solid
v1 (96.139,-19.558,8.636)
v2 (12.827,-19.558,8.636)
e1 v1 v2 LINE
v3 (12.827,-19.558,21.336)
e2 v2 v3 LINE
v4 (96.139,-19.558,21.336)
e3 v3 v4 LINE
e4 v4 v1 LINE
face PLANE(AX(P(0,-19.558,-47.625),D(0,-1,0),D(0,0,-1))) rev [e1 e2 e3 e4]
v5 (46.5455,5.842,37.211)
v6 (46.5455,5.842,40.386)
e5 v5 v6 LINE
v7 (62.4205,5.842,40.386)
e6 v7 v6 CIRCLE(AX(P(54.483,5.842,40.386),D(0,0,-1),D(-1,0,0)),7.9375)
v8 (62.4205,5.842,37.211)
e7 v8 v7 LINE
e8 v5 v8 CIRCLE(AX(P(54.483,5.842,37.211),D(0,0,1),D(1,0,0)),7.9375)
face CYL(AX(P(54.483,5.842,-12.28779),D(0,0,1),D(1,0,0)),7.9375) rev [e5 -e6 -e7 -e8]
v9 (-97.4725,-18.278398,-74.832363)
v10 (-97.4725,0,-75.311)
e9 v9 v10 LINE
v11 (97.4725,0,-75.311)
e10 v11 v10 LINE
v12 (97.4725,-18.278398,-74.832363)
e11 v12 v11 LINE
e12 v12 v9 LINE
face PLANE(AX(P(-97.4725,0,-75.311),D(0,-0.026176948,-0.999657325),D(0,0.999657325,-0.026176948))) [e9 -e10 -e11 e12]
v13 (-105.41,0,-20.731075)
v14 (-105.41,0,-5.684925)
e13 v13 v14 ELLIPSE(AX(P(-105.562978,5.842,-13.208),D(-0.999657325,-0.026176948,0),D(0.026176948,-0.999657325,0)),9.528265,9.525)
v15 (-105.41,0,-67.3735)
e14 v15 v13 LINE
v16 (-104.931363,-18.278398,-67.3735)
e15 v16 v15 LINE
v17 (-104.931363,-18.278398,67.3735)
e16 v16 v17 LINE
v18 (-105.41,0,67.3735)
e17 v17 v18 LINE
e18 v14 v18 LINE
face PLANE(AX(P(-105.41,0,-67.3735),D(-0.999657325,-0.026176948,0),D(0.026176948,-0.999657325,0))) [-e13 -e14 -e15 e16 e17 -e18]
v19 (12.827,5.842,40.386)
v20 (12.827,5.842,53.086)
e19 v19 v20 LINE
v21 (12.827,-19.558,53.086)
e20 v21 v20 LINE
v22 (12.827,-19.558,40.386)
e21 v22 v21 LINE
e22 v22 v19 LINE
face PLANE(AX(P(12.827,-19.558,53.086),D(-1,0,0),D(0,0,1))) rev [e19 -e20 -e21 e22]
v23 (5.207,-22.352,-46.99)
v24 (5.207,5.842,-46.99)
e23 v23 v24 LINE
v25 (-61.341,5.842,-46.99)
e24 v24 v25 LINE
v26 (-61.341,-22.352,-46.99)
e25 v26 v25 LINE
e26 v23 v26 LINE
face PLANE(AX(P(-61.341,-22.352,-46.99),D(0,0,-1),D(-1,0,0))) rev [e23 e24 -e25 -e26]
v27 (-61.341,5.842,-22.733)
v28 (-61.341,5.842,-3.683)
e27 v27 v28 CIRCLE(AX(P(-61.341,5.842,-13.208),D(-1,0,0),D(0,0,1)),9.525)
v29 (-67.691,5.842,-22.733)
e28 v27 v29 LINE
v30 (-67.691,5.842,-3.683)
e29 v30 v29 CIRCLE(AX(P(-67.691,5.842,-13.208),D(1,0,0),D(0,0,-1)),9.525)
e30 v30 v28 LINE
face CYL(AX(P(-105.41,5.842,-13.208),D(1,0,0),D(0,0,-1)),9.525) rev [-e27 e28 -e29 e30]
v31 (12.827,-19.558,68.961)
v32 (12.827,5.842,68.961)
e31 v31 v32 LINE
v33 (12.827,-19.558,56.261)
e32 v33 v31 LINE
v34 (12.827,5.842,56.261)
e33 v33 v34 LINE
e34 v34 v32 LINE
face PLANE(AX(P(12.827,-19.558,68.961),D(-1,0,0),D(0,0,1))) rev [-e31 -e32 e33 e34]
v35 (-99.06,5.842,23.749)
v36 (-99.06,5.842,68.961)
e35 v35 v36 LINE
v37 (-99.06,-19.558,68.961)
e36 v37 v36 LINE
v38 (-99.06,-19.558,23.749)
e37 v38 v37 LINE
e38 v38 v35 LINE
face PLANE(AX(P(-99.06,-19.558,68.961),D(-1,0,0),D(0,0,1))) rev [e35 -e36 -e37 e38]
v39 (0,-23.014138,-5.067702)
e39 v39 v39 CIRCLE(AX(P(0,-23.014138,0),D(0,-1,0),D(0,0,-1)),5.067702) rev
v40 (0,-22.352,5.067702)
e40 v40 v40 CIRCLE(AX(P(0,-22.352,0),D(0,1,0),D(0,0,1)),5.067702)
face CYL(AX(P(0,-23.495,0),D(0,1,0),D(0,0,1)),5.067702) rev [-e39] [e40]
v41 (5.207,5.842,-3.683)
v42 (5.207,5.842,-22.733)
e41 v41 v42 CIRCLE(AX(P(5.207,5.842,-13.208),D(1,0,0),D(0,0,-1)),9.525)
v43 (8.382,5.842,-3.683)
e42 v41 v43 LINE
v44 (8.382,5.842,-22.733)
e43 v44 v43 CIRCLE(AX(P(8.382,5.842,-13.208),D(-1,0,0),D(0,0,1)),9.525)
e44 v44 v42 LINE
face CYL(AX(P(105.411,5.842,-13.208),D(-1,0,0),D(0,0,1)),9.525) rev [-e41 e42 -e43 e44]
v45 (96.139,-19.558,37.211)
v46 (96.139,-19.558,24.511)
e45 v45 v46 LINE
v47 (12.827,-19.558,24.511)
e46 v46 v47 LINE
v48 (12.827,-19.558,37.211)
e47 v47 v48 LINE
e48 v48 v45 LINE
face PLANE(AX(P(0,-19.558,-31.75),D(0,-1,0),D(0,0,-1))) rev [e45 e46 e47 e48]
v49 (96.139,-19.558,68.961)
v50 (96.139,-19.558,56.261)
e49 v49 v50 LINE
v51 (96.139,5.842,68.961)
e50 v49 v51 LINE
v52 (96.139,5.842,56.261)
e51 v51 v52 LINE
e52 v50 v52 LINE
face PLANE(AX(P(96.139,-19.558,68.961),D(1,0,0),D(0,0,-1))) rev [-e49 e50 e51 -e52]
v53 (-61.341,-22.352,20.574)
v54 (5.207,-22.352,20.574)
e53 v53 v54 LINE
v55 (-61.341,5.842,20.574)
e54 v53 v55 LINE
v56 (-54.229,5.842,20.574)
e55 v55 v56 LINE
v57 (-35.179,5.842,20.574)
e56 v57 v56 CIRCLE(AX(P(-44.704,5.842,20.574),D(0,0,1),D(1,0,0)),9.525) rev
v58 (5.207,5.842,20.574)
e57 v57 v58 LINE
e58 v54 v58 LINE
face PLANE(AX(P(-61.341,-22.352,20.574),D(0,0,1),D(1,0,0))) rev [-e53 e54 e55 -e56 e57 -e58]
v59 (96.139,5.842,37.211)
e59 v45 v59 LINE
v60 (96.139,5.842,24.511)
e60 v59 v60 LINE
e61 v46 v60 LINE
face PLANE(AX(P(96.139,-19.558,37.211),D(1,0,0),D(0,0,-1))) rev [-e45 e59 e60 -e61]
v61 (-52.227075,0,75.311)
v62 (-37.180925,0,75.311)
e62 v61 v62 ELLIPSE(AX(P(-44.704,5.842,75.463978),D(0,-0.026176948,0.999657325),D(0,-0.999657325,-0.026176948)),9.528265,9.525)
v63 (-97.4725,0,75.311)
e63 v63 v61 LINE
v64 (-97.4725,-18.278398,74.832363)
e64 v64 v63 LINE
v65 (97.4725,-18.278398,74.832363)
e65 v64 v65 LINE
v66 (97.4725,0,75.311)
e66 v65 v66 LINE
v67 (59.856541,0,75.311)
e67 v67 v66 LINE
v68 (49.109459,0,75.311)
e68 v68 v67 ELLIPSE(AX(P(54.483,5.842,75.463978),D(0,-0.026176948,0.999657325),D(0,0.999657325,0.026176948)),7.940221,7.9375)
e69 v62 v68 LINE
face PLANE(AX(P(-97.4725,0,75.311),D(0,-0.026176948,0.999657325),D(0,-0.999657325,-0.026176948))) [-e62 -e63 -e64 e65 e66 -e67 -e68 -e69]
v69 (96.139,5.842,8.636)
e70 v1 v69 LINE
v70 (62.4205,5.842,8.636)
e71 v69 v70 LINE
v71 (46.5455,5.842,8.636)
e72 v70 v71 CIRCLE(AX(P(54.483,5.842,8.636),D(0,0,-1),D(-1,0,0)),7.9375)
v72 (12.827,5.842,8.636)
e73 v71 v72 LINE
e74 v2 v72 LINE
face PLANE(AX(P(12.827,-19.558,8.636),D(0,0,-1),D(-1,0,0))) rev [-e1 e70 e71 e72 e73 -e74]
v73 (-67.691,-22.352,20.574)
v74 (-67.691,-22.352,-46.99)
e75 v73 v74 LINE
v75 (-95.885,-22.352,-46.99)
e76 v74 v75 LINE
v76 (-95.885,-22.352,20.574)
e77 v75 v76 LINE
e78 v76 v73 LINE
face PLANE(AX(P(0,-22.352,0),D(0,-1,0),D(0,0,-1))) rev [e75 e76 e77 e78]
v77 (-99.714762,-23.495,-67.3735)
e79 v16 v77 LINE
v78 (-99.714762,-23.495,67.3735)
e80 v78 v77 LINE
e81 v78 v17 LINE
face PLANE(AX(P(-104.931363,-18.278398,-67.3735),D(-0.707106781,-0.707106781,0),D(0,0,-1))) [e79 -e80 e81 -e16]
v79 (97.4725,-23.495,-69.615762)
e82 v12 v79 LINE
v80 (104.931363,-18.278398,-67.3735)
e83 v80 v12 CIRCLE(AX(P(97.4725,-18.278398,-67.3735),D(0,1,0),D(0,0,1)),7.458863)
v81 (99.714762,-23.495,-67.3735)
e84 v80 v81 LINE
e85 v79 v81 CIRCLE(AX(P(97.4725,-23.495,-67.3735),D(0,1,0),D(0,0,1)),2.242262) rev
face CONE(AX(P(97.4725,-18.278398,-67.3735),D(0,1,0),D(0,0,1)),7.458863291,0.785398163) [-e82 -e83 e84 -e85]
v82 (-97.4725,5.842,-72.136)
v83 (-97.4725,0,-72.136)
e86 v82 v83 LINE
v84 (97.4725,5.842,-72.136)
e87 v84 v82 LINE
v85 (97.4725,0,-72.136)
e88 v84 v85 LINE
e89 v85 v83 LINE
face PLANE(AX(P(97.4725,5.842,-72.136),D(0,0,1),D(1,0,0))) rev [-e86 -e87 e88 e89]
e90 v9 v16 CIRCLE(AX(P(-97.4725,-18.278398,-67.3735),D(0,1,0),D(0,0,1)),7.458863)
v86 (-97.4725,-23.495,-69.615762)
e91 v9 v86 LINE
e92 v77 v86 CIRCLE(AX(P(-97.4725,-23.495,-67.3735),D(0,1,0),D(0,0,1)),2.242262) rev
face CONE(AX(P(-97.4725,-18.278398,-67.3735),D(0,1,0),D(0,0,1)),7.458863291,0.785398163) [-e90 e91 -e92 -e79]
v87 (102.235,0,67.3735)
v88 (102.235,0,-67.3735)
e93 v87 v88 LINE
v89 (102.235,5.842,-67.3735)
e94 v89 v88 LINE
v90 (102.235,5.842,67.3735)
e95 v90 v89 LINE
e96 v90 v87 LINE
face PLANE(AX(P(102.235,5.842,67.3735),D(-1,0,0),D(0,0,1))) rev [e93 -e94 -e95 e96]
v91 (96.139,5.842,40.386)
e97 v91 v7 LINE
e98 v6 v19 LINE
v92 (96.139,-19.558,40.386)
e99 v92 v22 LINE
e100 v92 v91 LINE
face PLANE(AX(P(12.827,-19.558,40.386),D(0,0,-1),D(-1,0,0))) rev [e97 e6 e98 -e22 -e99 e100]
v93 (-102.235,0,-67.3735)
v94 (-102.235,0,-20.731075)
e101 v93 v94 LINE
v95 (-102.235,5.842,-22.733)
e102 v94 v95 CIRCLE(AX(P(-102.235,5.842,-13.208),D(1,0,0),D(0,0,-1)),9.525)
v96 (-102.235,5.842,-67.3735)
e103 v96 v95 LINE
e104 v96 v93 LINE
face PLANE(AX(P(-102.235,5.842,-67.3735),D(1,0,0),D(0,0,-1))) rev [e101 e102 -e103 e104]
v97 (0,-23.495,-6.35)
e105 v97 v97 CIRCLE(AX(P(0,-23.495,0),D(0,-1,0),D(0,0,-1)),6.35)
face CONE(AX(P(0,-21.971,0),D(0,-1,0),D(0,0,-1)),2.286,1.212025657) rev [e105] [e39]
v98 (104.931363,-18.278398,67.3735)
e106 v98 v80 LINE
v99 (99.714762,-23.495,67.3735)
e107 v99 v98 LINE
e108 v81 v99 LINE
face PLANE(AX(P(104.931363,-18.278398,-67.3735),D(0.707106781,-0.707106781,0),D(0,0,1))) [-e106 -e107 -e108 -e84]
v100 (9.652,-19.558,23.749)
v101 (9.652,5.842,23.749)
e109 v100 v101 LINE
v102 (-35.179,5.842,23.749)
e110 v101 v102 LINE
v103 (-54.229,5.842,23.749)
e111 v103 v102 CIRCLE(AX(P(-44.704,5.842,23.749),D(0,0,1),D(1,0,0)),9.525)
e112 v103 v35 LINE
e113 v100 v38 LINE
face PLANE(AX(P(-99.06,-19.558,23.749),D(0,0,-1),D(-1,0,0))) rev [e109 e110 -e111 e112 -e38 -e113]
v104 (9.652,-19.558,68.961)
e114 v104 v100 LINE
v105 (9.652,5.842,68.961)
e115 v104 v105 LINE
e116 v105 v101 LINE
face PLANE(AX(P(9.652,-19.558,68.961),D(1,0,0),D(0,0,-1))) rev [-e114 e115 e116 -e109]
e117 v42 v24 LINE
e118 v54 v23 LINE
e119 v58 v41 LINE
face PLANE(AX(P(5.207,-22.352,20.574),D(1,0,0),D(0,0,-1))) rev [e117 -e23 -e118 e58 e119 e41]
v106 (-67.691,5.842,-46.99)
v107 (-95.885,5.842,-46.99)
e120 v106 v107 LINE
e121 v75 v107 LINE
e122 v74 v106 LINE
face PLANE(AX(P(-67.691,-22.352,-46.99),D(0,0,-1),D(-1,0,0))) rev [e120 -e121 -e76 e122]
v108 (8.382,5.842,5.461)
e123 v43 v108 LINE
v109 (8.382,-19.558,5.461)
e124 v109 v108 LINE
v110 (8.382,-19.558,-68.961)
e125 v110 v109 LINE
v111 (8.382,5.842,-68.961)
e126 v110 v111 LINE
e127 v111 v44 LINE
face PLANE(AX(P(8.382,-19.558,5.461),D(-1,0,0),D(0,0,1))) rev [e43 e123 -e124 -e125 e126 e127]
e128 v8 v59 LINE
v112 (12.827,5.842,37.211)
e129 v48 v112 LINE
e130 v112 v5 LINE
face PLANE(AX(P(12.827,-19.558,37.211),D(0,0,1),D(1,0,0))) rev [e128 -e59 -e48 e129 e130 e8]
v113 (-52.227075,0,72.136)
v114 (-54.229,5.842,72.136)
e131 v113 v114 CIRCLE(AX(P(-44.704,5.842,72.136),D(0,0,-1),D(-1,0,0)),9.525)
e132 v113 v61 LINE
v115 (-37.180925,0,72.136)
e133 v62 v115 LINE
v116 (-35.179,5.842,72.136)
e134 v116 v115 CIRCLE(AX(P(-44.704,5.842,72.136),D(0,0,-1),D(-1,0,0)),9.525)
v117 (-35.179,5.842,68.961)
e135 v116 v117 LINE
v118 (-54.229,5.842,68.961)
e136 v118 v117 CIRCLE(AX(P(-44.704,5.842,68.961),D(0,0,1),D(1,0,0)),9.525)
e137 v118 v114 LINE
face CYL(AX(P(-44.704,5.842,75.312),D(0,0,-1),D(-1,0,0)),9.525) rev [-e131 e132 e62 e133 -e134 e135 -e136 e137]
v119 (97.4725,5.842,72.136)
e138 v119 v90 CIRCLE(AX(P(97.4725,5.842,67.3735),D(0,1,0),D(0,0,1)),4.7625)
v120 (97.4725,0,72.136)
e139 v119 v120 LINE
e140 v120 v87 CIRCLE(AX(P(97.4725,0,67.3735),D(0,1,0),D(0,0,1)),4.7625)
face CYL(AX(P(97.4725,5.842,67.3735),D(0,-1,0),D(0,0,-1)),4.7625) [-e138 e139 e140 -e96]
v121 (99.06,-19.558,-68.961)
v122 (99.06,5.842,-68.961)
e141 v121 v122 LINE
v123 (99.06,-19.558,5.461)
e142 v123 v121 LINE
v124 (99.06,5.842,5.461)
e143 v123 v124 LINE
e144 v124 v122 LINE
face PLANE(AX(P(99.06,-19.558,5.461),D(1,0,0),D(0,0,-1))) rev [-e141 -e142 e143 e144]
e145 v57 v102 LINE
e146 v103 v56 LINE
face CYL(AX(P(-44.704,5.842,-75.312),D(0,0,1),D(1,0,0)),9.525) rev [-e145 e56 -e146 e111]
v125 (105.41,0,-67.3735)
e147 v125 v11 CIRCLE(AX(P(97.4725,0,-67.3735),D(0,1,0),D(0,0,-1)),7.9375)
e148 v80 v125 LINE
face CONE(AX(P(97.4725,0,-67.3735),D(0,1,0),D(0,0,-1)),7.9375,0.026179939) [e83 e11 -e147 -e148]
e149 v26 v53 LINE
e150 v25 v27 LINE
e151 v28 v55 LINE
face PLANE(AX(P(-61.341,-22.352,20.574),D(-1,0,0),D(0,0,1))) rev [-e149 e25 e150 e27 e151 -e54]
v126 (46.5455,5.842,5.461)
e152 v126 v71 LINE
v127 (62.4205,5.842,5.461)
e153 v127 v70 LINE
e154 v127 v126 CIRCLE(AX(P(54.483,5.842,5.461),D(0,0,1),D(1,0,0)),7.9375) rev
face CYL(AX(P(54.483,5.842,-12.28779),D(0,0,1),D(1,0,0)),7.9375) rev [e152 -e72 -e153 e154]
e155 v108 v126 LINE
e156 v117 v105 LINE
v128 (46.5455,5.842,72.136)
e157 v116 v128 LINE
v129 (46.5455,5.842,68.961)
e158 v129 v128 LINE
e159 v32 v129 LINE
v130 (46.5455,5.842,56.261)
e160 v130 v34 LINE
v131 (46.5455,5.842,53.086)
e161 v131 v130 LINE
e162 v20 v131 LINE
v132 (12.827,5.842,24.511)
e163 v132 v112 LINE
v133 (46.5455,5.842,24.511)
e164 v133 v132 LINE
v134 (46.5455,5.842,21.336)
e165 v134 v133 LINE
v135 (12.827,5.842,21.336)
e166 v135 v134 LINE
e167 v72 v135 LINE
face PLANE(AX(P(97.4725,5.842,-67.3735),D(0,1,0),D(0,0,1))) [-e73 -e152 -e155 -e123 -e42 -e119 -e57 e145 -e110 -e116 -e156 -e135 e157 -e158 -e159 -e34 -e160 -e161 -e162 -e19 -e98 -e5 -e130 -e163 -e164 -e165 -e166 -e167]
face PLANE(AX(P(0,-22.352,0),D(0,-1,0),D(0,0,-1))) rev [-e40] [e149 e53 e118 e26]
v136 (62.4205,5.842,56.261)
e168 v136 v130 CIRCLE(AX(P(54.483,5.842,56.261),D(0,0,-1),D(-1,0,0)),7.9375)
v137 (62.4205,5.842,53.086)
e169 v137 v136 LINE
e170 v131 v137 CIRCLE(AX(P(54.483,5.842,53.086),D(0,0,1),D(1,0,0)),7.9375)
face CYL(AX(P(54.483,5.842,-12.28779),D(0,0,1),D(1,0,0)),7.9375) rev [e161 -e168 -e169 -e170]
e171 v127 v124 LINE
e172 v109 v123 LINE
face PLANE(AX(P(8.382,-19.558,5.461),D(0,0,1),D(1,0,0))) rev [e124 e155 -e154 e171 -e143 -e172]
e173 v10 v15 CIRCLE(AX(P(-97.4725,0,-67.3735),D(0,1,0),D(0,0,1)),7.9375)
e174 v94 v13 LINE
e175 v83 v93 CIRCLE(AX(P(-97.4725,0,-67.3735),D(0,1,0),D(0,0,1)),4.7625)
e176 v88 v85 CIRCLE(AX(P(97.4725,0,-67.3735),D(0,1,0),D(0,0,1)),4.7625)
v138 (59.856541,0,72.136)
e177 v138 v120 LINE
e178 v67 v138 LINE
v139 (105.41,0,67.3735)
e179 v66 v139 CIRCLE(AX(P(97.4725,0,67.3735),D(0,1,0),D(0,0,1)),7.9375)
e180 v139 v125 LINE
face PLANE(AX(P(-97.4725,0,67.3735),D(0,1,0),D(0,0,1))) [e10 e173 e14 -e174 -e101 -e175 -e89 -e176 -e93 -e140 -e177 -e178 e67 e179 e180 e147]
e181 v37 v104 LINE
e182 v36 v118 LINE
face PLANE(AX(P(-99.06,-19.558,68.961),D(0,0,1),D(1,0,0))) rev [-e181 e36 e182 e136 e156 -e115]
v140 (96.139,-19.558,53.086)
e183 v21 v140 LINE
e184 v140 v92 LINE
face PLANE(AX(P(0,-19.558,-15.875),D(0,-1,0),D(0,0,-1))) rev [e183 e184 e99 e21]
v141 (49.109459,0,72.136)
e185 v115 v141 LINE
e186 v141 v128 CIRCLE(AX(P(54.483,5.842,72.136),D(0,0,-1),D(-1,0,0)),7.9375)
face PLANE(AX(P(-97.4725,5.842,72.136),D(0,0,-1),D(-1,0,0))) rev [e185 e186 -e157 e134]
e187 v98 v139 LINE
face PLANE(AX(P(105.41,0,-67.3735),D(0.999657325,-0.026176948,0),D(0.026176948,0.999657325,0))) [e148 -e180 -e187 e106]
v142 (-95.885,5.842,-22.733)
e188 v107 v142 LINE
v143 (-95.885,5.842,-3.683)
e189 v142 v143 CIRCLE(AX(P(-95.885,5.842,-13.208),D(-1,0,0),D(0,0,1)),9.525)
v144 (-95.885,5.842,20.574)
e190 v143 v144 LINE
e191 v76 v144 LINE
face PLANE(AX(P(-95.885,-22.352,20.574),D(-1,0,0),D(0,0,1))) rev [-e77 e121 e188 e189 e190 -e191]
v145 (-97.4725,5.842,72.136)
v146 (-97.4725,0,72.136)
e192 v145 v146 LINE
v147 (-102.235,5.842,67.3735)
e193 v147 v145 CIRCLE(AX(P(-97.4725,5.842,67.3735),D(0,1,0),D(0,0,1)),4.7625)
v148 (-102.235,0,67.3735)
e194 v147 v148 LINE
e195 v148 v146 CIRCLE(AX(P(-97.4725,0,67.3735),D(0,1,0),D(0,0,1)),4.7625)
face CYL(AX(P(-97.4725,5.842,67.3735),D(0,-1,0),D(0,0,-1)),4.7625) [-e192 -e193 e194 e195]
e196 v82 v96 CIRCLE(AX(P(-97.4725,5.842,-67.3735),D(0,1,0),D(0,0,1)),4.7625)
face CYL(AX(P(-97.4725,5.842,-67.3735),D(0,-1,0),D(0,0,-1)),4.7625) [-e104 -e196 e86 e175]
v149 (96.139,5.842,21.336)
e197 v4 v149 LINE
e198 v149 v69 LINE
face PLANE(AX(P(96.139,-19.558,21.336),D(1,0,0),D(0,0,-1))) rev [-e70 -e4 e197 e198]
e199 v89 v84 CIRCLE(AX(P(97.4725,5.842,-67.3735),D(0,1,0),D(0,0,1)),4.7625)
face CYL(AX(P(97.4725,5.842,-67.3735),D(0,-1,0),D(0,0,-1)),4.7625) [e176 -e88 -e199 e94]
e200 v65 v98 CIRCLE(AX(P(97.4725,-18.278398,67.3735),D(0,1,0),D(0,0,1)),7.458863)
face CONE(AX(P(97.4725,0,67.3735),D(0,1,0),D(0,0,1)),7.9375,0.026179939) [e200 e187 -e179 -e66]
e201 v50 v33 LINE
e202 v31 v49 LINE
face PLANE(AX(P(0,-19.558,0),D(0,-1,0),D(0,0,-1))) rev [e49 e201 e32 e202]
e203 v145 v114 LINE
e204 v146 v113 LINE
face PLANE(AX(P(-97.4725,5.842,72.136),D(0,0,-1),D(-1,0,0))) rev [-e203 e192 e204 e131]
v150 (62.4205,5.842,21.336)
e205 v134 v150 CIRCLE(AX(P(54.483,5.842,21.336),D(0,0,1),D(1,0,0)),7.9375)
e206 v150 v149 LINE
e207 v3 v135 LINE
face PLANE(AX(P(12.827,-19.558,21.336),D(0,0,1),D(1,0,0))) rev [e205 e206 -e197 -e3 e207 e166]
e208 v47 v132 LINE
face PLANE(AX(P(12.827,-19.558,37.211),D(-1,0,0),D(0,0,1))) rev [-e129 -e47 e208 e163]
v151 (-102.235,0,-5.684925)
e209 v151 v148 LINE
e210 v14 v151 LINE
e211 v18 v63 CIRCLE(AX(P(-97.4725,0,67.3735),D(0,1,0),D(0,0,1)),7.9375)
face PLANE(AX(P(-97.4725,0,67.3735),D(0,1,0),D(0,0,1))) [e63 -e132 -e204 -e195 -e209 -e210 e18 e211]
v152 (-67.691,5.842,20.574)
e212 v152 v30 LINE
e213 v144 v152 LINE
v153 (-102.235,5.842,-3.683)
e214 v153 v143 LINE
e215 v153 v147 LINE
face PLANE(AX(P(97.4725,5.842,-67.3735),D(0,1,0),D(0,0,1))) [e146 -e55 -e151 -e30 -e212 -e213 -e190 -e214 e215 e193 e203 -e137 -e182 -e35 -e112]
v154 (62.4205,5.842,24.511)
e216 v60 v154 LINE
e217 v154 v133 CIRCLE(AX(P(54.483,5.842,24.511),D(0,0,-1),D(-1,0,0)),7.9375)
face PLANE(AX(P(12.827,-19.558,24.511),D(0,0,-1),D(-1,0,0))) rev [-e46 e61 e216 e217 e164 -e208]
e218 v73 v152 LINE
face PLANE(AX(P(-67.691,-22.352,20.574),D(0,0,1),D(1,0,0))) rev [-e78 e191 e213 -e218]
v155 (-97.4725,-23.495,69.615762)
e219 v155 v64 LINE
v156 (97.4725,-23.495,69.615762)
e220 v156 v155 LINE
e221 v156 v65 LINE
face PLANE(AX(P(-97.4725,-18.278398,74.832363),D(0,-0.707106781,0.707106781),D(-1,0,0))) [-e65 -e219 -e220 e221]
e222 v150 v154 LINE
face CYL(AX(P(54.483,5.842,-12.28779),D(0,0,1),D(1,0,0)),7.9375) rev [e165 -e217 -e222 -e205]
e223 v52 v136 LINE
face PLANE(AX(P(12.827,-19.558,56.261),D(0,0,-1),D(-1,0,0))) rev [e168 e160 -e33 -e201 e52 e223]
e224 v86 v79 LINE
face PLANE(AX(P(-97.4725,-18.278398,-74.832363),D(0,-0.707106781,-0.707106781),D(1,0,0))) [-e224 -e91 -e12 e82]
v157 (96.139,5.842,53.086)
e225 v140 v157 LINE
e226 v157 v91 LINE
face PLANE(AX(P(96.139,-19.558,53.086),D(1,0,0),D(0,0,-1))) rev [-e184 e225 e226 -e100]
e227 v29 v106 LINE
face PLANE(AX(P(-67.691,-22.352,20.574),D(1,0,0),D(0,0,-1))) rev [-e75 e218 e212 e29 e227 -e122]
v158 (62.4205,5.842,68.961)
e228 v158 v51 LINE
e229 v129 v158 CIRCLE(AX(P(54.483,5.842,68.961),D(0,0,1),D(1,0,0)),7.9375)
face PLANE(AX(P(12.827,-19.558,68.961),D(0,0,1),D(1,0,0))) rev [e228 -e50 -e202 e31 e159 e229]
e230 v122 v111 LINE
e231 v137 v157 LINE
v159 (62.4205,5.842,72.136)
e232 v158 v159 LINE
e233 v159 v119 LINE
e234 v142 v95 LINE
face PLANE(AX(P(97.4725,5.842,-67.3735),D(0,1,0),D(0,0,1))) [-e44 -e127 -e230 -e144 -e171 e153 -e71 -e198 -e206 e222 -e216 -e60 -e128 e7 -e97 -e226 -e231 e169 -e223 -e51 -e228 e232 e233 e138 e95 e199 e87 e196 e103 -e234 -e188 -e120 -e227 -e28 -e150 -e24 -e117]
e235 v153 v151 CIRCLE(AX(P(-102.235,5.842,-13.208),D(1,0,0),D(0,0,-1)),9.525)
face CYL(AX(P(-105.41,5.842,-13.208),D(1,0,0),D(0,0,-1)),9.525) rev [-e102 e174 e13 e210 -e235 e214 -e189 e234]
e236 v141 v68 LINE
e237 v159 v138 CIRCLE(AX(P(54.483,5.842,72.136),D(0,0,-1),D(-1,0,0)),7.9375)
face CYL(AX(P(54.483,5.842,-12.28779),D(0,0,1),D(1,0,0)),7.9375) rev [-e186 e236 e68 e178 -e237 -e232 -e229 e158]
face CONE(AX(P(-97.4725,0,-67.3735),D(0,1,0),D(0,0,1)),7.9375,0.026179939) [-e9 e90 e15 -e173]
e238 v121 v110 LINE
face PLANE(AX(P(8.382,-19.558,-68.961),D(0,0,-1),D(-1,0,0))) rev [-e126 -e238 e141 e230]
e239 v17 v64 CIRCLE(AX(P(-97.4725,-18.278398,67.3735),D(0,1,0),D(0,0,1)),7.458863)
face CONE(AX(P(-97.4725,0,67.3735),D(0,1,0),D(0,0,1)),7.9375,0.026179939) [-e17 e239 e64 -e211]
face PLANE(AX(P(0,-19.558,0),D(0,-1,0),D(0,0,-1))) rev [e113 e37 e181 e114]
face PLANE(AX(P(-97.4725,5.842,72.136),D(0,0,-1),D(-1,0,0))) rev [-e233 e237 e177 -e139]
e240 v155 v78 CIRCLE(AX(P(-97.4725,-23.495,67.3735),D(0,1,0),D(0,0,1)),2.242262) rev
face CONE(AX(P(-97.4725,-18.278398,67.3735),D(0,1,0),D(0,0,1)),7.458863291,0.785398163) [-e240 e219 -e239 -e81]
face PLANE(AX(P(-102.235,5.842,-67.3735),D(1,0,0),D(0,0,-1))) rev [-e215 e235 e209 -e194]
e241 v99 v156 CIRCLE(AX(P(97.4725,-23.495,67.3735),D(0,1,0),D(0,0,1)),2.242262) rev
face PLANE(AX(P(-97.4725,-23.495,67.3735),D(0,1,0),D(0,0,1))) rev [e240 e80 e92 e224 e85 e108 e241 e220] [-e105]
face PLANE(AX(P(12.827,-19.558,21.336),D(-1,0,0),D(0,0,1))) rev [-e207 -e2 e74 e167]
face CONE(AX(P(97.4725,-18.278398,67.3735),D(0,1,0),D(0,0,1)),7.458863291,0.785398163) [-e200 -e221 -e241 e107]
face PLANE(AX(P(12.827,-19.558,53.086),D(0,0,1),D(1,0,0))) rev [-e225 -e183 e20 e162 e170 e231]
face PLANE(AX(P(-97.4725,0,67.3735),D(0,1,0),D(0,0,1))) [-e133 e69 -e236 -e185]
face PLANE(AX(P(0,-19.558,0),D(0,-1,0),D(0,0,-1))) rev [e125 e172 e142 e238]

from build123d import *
from OCP.BRepFilletAPI import BRepFilletAPI_MakeChamfer

# Parameters (mm, degrees)
BOSS_EXTRUDE1_DEPTH            = 23.495
BOSS_EXTRUDE1_DRAFT            = -1.5
CHAMFER1_SIZE                  = 5.21838973
CHAMFER1_SIZE_2                = 5.08
BOSS_EXTRUDE2_DEPTH            = 5.842
SKETCH3_W                      = 108.712
SKETCH3_H                      = 45.212
CUT_EXTRUDE1_DEPTH             = 25.4
SKETCH4_R                      = 6.35
CUT_EXTRUDE2_DEPTH             = 1.524
CHAMFER2_SIZE2                 = 4.064
CHAMFER2_SIZE                  = 1.524
SKETCH5_W                      = 28.194
SKETCH5_H                      = 67.564
SKETCH5_W_2                    = 66.548
CUT_EXTRUDE3_DEPTH             = 28.194
SKETCH6_W                      = 83.312
SKETCH6_H                      = 12.7
CUT_EXTRUDE4_DEPTH             = 25.4
LPATTERN2_COUNT                = 4
LPATTERN2_PITCH                = 15.875
SKETCH8_W                      = 90.678
SKETCH8_H                      = 74.422
CUT_EXTRUDE5_DEPTH             = 25.4
CUT_EXTRUDE6_REACH             = 148.547
SKETCH10_R                     = 9.525
CUT_EXTRUDE6_DIRECTION_2_REACH = 148.547
SKETCH11_R                     = 9.525
CUT_EXTRUDE7_DEPTH             = 185.471292474
CUT_EXTRUDE7_DIRECTION_2_REACH = 186.471
CUT_EXTRUDE8_REACH             = 172.219
CUT_EXTRUDE8_DIRECTION_2_DEPTH = 171.218901151
SKETCH12_R                     = 5.067701835
CUT_EXTRUDE9_DEPTH             = 133.581735005


with BuildPart() as part:
    # Sketch1 → Boss-Extrude1 (with draft: the straight prism first)
    with BuildSketch(Plane(origin=(0, 0, 0), x_dir=(1, 0, 0), z_dir=(0, 1, 0))):
        with BuildLine():
            ThreePointArc((-97.4725, 75.311), (-103.085160076, 72.986160076), (-105.41, 67.3735))
            Line((-105.41, 67.3735), (-105.41, -67.3735))
            ThreePointArc((-105.41, -67.3735), (-103.085160076, -72.986160076), (-97.4725, -75.311))
            Line((-97.4725, -75.311), (97.4725, -75.311))
            ThreePointArc((97.4725, -75.311), (103.085160076, -72.986160076), (105.41, -67.3735))
            Line((105.41, -67.3735), (105.41, 67.3735))
            ThreePointArc((105.41, 67.3735), (103.085160076, 72.986160076), (97.4725, 75.311))
            Line((97.4725, 75.311), (-97.4725, 75.311))
        make_face()
    extrude(amount=-BOSS_EXTRUDE1_DEPTH)
    # Boss-Extrude1: the draft: its side faces are tilted about the plane it starts from
    boss_extrude1_sides = [part.faces().sort_by_distance(p)[0] for p in [
        (-103.085160076, -11.7475, -72.986160076),
        (-105.41, -11.7475, 0),
        (-103.085160076, -11.7475, 72.986160076),
        (0, -11.7475, 75.311),
        (103.085160076, -11.7475, 72.986160076),
        (105.41, -11.7475, 0),
        (103.085160076, -11.7475, -72.986160076),
        (0, -11.7475, -75.311),
    ]]
    draft(boss_extrude1_sides, Plane(origin=(0, 0, 0), x_dir=(1, 0, 0), z_dir=(0, 1, 0)), BOSS_EXTRUDE1_DRAFT)

    # Chamfer1
    chamfer1_edges_1 = [part.edges().sort_by_distance(p)[0] for p in [
        (-102.650120953, -23.495, -72.551120953),
    ]]
    chamfer1_side_1 = [part.faces().sort_by_distance(p)[0] for p in [
        (-102.652001559, -23.393434816, -72.553001559),
    ]]
    chamfer1_edges_2 = [part.edges().sort_by_distance(p)[0] for p in [
        (-104.794761773, -23.495, 0),
    ]]
    chamfer1_side_2 = [part.faces().sort_by_distance(p)[0] for p in [
        (-104.797421351, -23.393434816, 0),
    ]]
    chamfer1_edges_3 = [part.edges().sort_by_distance(p)[0] for p in [
        (-102.650120953, -23.495, 72.551120953),
    ]]
    chamfer1_side_3 = [part.faces().sort_by_distance(p)[0] for p in [
        (-102.652001559, -23.393434816, 72.553001559),
    ]]
    chamfer1_edges_4 = [part.edges().sort_by_distance(p)[0] for p in [
        (0, -23.495, 74.695761773),
    ]]
    chamfer1_side_4 = [part.faces().sort_by_distance(p)[0] for p in [
        (0, -23.393434816, 74.698421351),
    ]]
    chamfer1_edges_5 = [part.edges().sort_by_distance(p)[0] for p in [
        (102.650120953, -23.495, 72.551120953),
    ]]
    chamfer1_side_5 = [part.faces().sort_by_distance(p)[0] for p in [
        (102.652001559, -23.393434816, 72.553001559),
    ]]
    chamfer1_edges_6 = [part.edges().sort_by_distance(p)[0] for p in [
        (104.794761773, -23.495, 0),
    ]]
    chamfer1_side_6 = [part.faces().sort_by_distance(p)[0] for p in [
        (104.797421351, -23.393434816, 0),
    ]]
    chamfer1_edges_7 = [part.edges().sort_by_distance(p)[0] for p in [
        (102.650120953, -23.495, -72.551120953),
    ]]
    chamfer1_side_7 = [part.faces().sort_by_distance(p)[0] for p in [
        (102.652001559, -23.393434816, -72.553001559),
    ]]
    chamfer1_edges_8 = [part.edges().sort_by_distance(p)[0] for p in [
        (0, -23.495, -74.695761773),
    ]]
    chamfer1_side_8 = [part.faces().sort_by_distance(p)[0] for p in [
        (0, -23.393434816, -74.698421351),
    ]]
    chamfer1 = BRepFilletAPI_MakeChamfer(part.part.solid().wrapped)
    for e in chamfer1_edges_1:
        chamfer1.Add(CHAMFER1_SIZE, CHAMFER1_SIZE_2, e.wrapped, chamfer1_side_1[0].wrapped)
    for e in chamfer1_edges_2:
        chamfer1.Add(CHAMFER1_SIZE, CHAMFER1_SIZE_2, e.wrapped, chamfer1_side_2[0].wrapped)
    for e in chamfer1_edges_3:
        chamfer1.Add(CHAMFER1_SIZE, CHAMFER1_SIZE_2, e.wrapped, chamfer1_side_3[0].wrapped)
    for e in chamfer1_edges_4:
        chamfer1.Add(CHAMFER1_SIZE, CHAMFER1_SIZE_2, e.wrapped, chamfer1_side_4[0].wrapped)
    for e in chamfer1_edges_5:
        chamfer1.Add(CHAMFER1_SIZE_2, CHAMFER1_SIZE, e.wrapped, chamfer1_side_5[0].wrapped)
    for e in chamfer1_edges_6:
        chamfer1.Add(CHAMFER1_SIZE, CHAMFER1_SIZE_2, e.wrapped, chamfer1_side_6[0].wrapped)
    for e in chamfer1_edges_7:
        chamfer1.Add(CHAMFER1_SIZE, CHAMFER1_SIZE_2, e.wrapped, chamfer1_side_7[0].wrapped)
    for e in chamfer1_edges_8:
        chamfer1.Add(CHAMFER1_SIZE, CHAMFER1_SIZE_2, e.wrapped, chamfer1_side_8[0].wrapped)
    add(Compound.cast(chamfer1.Shape()), mode=Mode.REPLACE)

    # Sketch2 → Boss-Extrude2 (add)
    with BuildSketch(Plane(origin=(0, 0, 0), x_dir=(1, 0, 0), z_dir=(0, 1, 0))):
        with BuildLine():
            Line((97.4725, 72.136), (-97.4725, 72.136))
            ThreePointArc((-97.4725, 72.136), (-100.840096045, 70.741096045), (-102.235, 67.3735))
            Line((-102.235, 67.3735), (-102.235, -67.3735))
            ThreePointArc((-102.235, -67.3735), (-100.840096045, -70.741096045), (-97.4725, -72.136))
            Line((-97.4725, -72.136), (97.4725, -72.136))
            ThreePointArc((97.4725, -72.136), (100.840096045, -70.741096045), (102.235, -67.3735))
            Line((102.235, -67.3735), (102.235, 67.3735))
            ThreePointArc((102.235, 67.3735), (100.840096045, 70.741096045), (97.4725, 72.136))
        make_face()
    extrude(amount=BOSS_EXTRUDE2_DEPTH)

    # Sketch3 → Cut-Extrude1 (cut)
    with BuildSketch(Plane(origin=(0, 5.842, 0), x_dir=(1, 0, 0), z_dir=(0, 1, 0))):
        with Locations((-44.704, -46.355)):
            Rectangle(SKETCH3_W, SKETCH3_H)
    extrude(amount=-CUT_EXTRUDE1_DEPTH, mode=Mode.SUBTRACT)

    # Sketch4 → Cut-Extrude2 (cut)
    with BuildSketch(Plane.XZ.offset(23.495)):
        with Locations(Location((0, 0, 0), (0, 0, 270))):
            Circle(SKETCH4_R)
    extrude(amount=-CUT_EXTRUDE2_DEPTH, mode=Mode.SUBTRACT)

    # Chamfer2
    chamfer2_edges = [part.edges().sort_by_distance(p)[0] for p in [
        (0, -21.971, 6.35),
    ]]
    chamfer2_side = [part.faces().sort_by_distance(p)[0] for p in [
        (0, -22.00148, 6.35),
    ]]
    chamfer(chamfer2_edges, length=CHAMFER2_SIZE - 0.0001, length2=CHAMFER2_SIZE2 - 0.0001, reference=chamfer2_side[0])  # a hair under: the kernel refuses the full size

    # Sketch5 → Cut-Extrude3 (cut)
    with BuildSketch(Plane(origin=(0, 5.842, 0), x_dir=(1, 0, 0), z_dir=(0, 1, 0))):
        with Locations((-81.788, 13.208)):
            Rectangle(SKETCH5_W, SKETCH5_H)
        with Locations((-28.067, 13.208)):
            Rectangle(SKETCH5_W_2, SKETCH5_H)
    extrude(amount=-CUT_EXTRUDE3_DEPTH, mode=Mode.SUBTRACT)

    # Sketch6 → Cut-Extrude4 (cut)
    with BuildSketch(Plane(origin=(0, 5.842, 0), x_dir=(1, 0, 0), z_dir=(0, 1, 0))):
        with Locations((54.483, -62.611)):
            Rectangle(SKETCH6_W, SKETCH6_H)
    cut_extrude4 = extrude(amount=-CUT_EXTRUDE4_DEPTH, mode=Mode.SUBTRACT)

    # LPattern2: Cut-Extrude4 ×4
    with Locations(*[(0, 0, -i * LPATTERN2_PITCH) for i in range(1, LPATTERN2_COUNT)]):
        add(cut_extrude4, mode=Mode.SUBTRACT)

    # Sketch8 → Cut-Extrude5 (cut)
    with BuildSketch(Plane(origin=(0, 5.842, 0), x_dir=(1, 0, 0), z_dir=(0, 1, 0))):
        with Locations((53.721, 31.75)):
            Rectangle(SKETCH8_W, SKETCH8_H)
    extrude(amount=-CUT_EXTRUDE5_DEPTH, mode=Mode.SUBTRACT)

    # Sketch10 → Cut-Extrude6 (cut, up to next)
    with BuildSketch(Plane.XY.offset(23.749), mode=Mode.PRIVATE) as cut_extrude6_sk1:
        with Locations((-44.704, 5.842)):
            Circle(SKETCH10_R)
    cut_extrude6_tool1 = extrude(cut_extrude6_sk1.sketch, amount=-CUT_EXTRUDE6_REACH, mode=Mode.PRIVATE) & part.part
    add(cut_extrude6_tool1.solids().sort_by_distance((-44.704, 5.842, 23.749))[0], mode=Mode.SUBTRACT)

    # Sketch10 → Cut-Extrude6 direction 2 (cut, up to next)
    with BuildSketch(Plane.XY.offset(23.749), mode=Mode.PRIVATE) as cut_extrude6_direction_2_sk1:
        with Locations((-44.704, 5.842)):
            Circle(SKETCH10_R)
    cut_extrude6_direction_2_tool1 = extrude(cut_extrude6_direction_2_sk1.sketch, amount=CUT_EXTRUDE6_DIRECTION_2_REACH, mode=Mode.PRIVATE) & part.part
    add(cut_extrude6_direction_2_tool1.solids().sort_by_distance((-44.704, 5.842, 23.749))[0], mode=Mode.SUBTRACT)

    # Sketch11 → Cut-Extrude7 (cut)
    with BuildSketch(Plane(origin=(-61.341, 0, 0), x_dir=(0, 0, -1), z_dir=(1, 0, 0))):
        with Locations((13.208, 5.842)):
            Circle(SKETCH11_R)
    extrude(amount=-CUT_EXTRUDE7_DEPTH, mode=Mode.SUBTRACT)

    # Sketch11 → Cut-Extrude7 direction 2 (cut, up to next)
    with BuildSketch(Plane(origin=(-61.341, 0, 0), x_dir=(0, 0, -1), z_dir=(1, 0, 0)), mode=Mode.PRIVATE) as cut_extrude7_direction_2_sk1:
        with Locations((13.208, 5.842)):
            Circle(SKETCH11_R)
    cut_extrude7_direction_2_tool1 = extrude(cut_extrude7_direction_2_sk1.sketch, amount=CUT_EXTRUDE7_DIRECTION_2_REACH, mode=Mode.PRIVATE) & part.part
    add(cut_extrude7_direction_2_tool1.solids().sort_by_distance((-61.341, 5.842, -13.208))[0], mode=Mode.SUBTRACT)

    # Cut-Extrude8: up to this face of the body (flat: up to its plane)
    cut_extrude8_end = Plane(part.part.faces().sort_by_distance((53.721, -6.858, 5.461))[0])
    # Sketch7 → Cut-Extrude8 (cut, up to the picked face)
    with BuildSketch(Plane.XY.offset(56.261), mode=Mode.PRIVATE) as cut_extrude8_sk1:
        with BuildLine():
            Line((46.5455, 5.842), (54.483, 5.842))
            Line((54.483, 5.842), (62.4205, 5.842))
            ThreePointArc((62.4205, 5.842), (54.483, -2.0955), (46.5455, 5.842))
        make_face()
    cut_extrude8_tool1 = split(extrude(cut_extrude8_sk1.sketch, amount=-CUT_EXTRUDE8_REACH, mode=Mode.PRIVATE), bisect_by=cut_extrude8_end, keep=Keep.BOTH, mode=Mode.PRIVATE)
    add(cut_extrude8_tool1.solids().sort_by(Axis((54.483, 2.47322, 56.261), (0, 0, -1)))[0], mode=Mode.SUBTRACT)

    # Sketch7 → Cut-Extrude8 direction 2 (cut)
    with BuildSketch(Plane.XY.offset(56.261)):
        with BuildLine():
            Line((46.5455, 5.842), (54.483, 5.842))
            Line((54.483, 5.842), (62.4205, 5.842))
            ThreePointArc((62.4205, 5.842), (54.483, -2.0955), (46.5455, 5.842))
        make_face()
    extrude(amount=CUT_EXTRUDE8_DIRECTION_2_DEPTH, mode=Mode.SUBTRACT)

    # Sketch12 → Cut-Extrude9 (cut, through all)
    with BuildSketch(Plane(origin=(0, -22.352, 0), x_dir=(1, 0, 0), z_dir=(0, 1, 0))):
        with Locations(Location((0, 0, 0), (0, 0, 270))):
            Circle(SKETCH12_R)
    extrude(amount=-CUT_EXTRUDE9_DEPTH, mode=Mode.SUBTRACT)


solid = part.part
